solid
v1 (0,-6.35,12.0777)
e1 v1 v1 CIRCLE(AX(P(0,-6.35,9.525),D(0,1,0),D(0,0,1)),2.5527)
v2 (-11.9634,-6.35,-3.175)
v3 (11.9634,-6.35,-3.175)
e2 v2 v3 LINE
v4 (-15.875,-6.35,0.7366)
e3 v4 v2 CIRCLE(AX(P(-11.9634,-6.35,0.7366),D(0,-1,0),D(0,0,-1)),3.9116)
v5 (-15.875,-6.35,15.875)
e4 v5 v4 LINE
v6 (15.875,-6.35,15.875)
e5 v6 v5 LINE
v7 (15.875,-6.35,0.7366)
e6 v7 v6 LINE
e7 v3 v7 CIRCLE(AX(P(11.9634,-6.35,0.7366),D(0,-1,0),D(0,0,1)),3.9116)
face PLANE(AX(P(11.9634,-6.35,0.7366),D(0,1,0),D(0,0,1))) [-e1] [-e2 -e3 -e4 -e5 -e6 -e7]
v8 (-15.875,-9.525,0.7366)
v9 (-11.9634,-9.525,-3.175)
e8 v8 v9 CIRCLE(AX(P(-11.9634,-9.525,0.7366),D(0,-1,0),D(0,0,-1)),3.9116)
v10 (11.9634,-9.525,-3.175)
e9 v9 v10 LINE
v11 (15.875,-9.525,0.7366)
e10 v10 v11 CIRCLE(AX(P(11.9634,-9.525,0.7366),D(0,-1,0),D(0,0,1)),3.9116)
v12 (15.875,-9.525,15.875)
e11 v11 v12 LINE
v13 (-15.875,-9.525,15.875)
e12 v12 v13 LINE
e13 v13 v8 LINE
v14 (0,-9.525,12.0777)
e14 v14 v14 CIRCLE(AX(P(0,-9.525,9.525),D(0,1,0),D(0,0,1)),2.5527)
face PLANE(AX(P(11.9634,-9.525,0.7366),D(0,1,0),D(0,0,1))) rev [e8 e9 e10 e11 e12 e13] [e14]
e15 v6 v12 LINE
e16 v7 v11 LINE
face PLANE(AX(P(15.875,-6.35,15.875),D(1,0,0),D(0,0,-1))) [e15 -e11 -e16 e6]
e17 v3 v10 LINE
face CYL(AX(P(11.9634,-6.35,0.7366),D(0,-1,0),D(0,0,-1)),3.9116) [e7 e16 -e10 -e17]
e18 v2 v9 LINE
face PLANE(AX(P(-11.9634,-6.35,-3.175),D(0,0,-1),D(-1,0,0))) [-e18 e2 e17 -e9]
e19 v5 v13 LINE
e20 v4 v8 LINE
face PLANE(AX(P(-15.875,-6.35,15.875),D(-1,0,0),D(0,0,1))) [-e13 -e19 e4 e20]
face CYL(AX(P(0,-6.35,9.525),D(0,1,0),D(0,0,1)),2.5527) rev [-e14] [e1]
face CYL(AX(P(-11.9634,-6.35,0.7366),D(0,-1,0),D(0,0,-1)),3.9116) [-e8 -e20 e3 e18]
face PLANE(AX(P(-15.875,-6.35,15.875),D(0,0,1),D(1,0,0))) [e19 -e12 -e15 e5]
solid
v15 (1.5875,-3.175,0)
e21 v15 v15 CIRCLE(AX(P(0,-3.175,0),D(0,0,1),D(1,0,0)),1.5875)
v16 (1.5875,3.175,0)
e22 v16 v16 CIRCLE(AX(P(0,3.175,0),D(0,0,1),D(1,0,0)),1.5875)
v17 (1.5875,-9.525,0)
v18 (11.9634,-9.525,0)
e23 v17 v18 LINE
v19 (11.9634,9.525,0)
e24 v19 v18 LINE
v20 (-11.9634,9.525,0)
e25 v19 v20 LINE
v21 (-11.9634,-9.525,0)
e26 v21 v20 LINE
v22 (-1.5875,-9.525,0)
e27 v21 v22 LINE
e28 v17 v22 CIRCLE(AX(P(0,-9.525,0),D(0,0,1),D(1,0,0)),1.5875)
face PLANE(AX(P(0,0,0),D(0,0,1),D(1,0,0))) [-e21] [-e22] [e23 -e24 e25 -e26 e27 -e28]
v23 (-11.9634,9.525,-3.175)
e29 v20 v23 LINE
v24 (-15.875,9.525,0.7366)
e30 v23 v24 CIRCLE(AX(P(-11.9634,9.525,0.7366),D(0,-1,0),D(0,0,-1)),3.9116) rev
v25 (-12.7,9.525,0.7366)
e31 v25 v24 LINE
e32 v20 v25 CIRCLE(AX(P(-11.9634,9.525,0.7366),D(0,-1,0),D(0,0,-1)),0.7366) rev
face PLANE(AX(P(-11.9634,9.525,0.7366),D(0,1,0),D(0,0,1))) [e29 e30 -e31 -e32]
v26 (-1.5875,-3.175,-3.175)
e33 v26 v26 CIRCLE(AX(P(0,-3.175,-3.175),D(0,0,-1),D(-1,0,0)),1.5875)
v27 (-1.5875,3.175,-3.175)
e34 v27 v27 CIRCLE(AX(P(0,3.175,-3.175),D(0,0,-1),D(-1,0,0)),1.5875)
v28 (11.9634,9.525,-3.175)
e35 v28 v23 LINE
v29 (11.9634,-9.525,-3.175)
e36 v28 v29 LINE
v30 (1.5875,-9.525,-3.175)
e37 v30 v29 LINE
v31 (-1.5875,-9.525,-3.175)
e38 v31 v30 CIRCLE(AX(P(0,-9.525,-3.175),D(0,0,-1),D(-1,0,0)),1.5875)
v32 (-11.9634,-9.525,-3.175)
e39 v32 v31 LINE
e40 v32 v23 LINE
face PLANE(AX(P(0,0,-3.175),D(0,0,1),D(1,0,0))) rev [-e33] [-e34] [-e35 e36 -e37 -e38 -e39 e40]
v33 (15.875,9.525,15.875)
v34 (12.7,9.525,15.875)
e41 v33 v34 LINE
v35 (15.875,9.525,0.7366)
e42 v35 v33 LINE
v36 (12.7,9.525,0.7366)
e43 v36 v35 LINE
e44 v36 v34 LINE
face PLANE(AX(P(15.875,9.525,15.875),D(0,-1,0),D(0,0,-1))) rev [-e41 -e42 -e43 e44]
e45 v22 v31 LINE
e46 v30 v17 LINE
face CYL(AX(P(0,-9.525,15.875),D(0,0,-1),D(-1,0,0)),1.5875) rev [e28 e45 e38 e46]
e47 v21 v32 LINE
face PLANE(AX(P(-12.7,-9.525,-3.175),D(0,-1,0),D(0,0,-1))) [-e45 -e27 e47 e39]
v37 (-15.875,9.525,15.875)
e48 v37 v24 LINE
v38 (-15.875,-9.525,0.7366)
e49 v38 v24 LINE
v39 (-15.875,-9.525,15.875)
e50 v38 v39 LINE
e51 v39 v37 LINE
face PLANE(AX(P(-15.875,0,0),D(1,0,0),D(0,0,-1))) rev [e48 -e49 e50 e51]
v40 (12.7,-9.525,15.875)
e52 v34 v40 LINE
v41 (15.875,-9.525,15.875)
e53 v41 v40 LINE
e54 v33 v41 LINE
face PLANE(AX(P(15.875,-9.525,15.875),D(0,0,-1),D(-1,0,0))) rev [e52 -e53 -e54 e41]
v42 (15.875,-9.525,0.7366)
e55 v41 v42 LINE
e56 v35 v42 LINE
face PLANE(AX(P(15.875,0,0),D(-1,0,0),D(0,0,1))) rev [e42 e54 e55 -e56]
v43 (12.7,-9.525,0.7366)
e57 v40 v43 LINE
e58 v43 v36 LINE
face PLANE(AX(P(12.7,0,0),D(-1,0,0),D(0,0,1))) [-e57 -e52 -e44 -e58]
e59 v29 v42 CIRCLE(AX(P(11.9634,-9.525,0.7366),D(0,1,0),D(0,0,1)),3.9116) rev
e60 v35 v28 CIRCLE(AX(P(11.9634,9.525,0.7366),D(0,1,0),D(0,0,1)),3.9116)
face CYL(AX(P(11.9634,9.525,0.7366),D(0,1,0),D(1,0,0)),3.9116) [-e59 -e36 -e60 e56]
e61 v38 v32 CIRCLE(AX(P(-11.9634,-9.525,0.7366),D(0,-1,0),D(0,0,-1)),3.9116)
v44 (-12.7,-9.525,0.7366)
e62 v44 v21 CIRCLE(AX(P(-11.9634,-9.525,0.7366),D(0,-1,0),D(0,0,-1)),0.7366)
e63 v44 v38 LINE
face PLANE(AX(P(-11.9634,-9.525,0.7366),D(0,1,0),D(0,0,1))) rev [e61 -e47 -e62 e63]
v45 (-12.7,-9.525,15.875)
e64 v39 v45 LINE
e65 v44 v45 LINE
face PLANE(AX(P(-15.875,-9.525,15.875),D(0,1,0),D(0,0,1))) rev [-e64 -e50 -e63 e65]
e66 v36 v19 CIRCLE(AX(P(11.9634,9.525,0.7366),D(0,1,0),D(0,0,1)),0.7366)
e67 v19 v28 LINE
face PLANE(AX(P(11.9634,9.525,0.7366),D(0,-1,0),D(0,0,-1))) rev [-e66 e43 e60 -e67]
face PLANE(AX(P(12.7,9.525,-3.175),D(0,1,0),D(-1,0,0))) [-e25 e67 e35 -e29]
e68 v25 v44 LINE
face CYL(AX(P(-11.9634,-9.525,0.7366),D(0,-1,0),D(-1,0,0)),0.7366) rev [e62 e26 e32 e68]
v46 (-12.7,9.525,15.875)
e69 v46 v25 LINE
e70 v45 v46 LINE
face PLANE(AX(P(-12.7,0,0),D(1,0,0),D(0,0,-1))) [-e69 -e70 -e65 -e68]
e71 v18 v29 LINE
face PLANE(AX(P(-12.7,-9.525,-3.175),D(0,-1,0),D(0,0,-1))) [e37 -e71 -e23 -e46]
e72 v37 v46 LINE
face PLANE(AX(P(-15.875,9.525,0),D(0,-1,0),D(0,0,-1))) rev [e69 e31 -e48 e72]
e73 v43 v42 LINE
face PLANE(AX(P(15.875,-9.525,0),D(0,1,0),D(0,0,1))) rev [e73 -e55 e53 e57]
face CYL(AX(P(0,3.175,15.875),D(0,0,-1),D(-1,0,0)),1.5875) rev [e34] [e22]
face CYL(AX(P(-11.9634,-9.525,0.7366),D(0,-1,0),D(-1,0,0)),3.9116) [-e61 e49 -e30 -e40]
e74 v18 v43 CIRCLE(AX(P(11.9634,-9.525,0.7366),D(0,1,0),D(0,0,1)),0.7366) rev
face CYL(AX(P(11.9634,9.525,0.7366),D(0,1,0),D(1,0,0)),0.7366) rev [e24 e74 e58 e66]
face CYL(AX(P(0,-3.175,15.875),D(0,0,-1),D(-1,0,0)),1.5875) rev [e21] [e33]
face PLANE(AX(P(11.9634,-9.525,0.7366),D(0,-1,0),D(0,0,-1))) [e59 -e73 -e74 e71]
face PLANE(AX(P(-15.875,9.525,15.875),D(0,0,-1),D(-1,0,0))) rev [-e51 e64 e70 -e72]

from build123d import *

# Parameters (mm, degrees)
SKETCH1_W                    = 25.4
SKETCH1_H                    = 19.05
BASE_FLANGE1_DEPTH           = 3.175
EDGE_FLANGE1_STRIP_W         = 14.1732
EDGE_FLANGE1_STRIP_H         = 3.175
EDGE_FLANGE1_STRIP_CUT_DEPTH = 19.05
EDGE_FLANGE1_DEPTH           = 19.05
EDGE_FLANGE2_STRIP_W         = 14.1732
EDGE_FLANGE2_STRIP_H         = 3.175
EDGE_FLANGE2_STRIP_CUT_DEPTH = 19.05
EDGE_FLANGE2_DEPTH           = 19.05
BASE_FLANGE2_DEPTH           = 3.175
SKETCH35_R                   = 1.5875
CUT_EXTRUDE2_DEPTH           = 27.563955842
SKETCH45_W                   = 2.5527
SKETCH45_H                   = 3.175


# Sheet-metal steps are written as plain solids
with BuildPart() as part:
    # Sketch1 → Base-Flange1 (new body)
    with BuildSketch(Plane.XY):
        Rectangle(SKETCH1_W, SKETCH1_H)
    extrude(amount=-BASE_FLANGE1_DEPTH)

    # Edge-Flange1 strip (across the edge) → Edge-Flange1 strip cut (cut)
    with BuildSketch(Plane(origin=(12.7, -9.525, 0), x_dir=(-1, 0, 0), z_dir=(0, 1, 0))):
        with Locations((-6.35, -1.5875)):
            Rectangle(EDGE_FLANGE1_STRIP_W, EDGE_FLANGE1_STRIP_H)
    extrude(amount=EDGE_FLANGE1_STRIP_CUT_DEPTH, mode=Mode.SUBTRACT)

    # Edge-Flange1 section (across the edge) → Edge-Flange1 (add)
    with BuildSketch(Plane(origin=(12.7, -9.525, 0), x_dir=(-1, 0, 0), z_dir=(0, 1, 0))):
        with BuildLine():
            Line((-3.175, 0.7366), (-3.175, 15.875))
            Line((-3.175, 15.875), (0, 15.875))
            Line((0, 15.875), (0, 0.7366))
            ThreePointArc((0, 0.7366), (0.215745145, 0.215745145), (0.7366, 0))
            Line((0.7366, 0), (0.7366, -3.175))
            ThreePointArc((0.7366, -3.175), (-2.029318885, -2.029318885), (-3.175, 0.7366))
        make_face()
    extrude(amount=EDGE_FLANGE1_DEPTH)

    # Edge-Flange2 strip (across the edge) → Edge-Flange2 strip cut (cut)
    with BuildSketch(Plane(origin=(-12.7, 9.525, 0), x_dir=(1, 0, 0), z_dir=(0, -1, 0))):
        with Locations((-6.35, -1.5875)):
            Rectangle(EDGE_FLANGE2_STRIP_W, EDGE_FLANGE2_STRIP_H)
    extrude(amount=EDGE_FLANGE2_STRIP_CUT_DEPTH, mode=Mode.SUBTRACT)

    # Edge-Flange2 section (across the edge) → Edge-Flange2 (add)
    with BuildSketch(Plane(origin=(-12.7, 9.525, 0), x_dir=(1, 0, 0), z_dir=(0, -1, 0))):
        with BuildLine():
            Line((-3.175, 0.7366), (-3.175, 15.875))
            Line((-3.175, 15.875), (0, 15.875))
            Line((0, 15.875), (0, 0.7366))
            ThreePointArc((0, 0.7366), (0.215745145, 0.215745145), (0.7366, 0))
            Line((0.7366, 0), (0.7366, -3.175))
            ThreePointArc((0.7366, -3.175), (-2.029318885, -2.029318885), (-3.175, 0.7366))
        make_face()
    extrude(amount=EDGE_FLANGE2_DEPTH)

    # Sketch35 → Cut-Extrude2 (cut, through all)
    with BuildSketch(Plane(origin=(0, 0, -3.175), x_dir=(-1, 0, 0), z_dir=(0, 0, -1))):
        with Locations((0, 3.175)):
            Circle(SKETCH35_R)
        with Locations((0, -3.175)):
            Circle(SKETCH35_R)
        with Locations((0, -9.525)):
            Circle(SKETCH35_R)
        with Locations((0, -15.875)):
            Circle(SKETCH35_R)
        with Locations((0, -22.225)):
            Circle(SKETCH35_R)
    extrude(amount=-CUT_EXTRUDE2_DEPTH, mode=Mode.SUBTRACT)


with BuildPart() as body_2:
    # Sketch32 → Base-Flange2 (new body)
    with BuildSketch(Plane.XZ.offset(9.525)):
        with BuildLine():
            Line((-15.875, 15.875), (-15.875, 0.7366))
            ThreePointArc((-15.875, 0.7366), (-14.729318885, -2.029318885), (-11.9634, -3.175))
            Line((-11.9634, -3.175), (11.9634, -3.175))
            ThreePointArc((11.9634, -3.175), (14.729318885, -2.029318885), (15.875, 0.7366))
            Line((15.875, 0.7366), (15.875, 15.875))
            Line((15.875, 15.875), (-15.875, 15.875))
        make_face()
    extrude(amount=-BASE_FLANGE2_DEPTH)

    # Sketch45 → Tap Drill for 1/4-20 Tap1 (revolve, cut)
    with BuildSketch(Plane(origin=(0, -6.35, 9.525), x_dir=(0, 0, 1), z_dir=(1, 0, 0))):
        with Locations((1.27635, 1.5875)):
            Rectangle(SKETCH45_W, SKETCH45_H)
    revolve(axis=Axis((0, 0, 9.525), (0, -1, 0)), mode=Mode.SUBTRACT)


solid = Compound([part.part, body_2.part])
